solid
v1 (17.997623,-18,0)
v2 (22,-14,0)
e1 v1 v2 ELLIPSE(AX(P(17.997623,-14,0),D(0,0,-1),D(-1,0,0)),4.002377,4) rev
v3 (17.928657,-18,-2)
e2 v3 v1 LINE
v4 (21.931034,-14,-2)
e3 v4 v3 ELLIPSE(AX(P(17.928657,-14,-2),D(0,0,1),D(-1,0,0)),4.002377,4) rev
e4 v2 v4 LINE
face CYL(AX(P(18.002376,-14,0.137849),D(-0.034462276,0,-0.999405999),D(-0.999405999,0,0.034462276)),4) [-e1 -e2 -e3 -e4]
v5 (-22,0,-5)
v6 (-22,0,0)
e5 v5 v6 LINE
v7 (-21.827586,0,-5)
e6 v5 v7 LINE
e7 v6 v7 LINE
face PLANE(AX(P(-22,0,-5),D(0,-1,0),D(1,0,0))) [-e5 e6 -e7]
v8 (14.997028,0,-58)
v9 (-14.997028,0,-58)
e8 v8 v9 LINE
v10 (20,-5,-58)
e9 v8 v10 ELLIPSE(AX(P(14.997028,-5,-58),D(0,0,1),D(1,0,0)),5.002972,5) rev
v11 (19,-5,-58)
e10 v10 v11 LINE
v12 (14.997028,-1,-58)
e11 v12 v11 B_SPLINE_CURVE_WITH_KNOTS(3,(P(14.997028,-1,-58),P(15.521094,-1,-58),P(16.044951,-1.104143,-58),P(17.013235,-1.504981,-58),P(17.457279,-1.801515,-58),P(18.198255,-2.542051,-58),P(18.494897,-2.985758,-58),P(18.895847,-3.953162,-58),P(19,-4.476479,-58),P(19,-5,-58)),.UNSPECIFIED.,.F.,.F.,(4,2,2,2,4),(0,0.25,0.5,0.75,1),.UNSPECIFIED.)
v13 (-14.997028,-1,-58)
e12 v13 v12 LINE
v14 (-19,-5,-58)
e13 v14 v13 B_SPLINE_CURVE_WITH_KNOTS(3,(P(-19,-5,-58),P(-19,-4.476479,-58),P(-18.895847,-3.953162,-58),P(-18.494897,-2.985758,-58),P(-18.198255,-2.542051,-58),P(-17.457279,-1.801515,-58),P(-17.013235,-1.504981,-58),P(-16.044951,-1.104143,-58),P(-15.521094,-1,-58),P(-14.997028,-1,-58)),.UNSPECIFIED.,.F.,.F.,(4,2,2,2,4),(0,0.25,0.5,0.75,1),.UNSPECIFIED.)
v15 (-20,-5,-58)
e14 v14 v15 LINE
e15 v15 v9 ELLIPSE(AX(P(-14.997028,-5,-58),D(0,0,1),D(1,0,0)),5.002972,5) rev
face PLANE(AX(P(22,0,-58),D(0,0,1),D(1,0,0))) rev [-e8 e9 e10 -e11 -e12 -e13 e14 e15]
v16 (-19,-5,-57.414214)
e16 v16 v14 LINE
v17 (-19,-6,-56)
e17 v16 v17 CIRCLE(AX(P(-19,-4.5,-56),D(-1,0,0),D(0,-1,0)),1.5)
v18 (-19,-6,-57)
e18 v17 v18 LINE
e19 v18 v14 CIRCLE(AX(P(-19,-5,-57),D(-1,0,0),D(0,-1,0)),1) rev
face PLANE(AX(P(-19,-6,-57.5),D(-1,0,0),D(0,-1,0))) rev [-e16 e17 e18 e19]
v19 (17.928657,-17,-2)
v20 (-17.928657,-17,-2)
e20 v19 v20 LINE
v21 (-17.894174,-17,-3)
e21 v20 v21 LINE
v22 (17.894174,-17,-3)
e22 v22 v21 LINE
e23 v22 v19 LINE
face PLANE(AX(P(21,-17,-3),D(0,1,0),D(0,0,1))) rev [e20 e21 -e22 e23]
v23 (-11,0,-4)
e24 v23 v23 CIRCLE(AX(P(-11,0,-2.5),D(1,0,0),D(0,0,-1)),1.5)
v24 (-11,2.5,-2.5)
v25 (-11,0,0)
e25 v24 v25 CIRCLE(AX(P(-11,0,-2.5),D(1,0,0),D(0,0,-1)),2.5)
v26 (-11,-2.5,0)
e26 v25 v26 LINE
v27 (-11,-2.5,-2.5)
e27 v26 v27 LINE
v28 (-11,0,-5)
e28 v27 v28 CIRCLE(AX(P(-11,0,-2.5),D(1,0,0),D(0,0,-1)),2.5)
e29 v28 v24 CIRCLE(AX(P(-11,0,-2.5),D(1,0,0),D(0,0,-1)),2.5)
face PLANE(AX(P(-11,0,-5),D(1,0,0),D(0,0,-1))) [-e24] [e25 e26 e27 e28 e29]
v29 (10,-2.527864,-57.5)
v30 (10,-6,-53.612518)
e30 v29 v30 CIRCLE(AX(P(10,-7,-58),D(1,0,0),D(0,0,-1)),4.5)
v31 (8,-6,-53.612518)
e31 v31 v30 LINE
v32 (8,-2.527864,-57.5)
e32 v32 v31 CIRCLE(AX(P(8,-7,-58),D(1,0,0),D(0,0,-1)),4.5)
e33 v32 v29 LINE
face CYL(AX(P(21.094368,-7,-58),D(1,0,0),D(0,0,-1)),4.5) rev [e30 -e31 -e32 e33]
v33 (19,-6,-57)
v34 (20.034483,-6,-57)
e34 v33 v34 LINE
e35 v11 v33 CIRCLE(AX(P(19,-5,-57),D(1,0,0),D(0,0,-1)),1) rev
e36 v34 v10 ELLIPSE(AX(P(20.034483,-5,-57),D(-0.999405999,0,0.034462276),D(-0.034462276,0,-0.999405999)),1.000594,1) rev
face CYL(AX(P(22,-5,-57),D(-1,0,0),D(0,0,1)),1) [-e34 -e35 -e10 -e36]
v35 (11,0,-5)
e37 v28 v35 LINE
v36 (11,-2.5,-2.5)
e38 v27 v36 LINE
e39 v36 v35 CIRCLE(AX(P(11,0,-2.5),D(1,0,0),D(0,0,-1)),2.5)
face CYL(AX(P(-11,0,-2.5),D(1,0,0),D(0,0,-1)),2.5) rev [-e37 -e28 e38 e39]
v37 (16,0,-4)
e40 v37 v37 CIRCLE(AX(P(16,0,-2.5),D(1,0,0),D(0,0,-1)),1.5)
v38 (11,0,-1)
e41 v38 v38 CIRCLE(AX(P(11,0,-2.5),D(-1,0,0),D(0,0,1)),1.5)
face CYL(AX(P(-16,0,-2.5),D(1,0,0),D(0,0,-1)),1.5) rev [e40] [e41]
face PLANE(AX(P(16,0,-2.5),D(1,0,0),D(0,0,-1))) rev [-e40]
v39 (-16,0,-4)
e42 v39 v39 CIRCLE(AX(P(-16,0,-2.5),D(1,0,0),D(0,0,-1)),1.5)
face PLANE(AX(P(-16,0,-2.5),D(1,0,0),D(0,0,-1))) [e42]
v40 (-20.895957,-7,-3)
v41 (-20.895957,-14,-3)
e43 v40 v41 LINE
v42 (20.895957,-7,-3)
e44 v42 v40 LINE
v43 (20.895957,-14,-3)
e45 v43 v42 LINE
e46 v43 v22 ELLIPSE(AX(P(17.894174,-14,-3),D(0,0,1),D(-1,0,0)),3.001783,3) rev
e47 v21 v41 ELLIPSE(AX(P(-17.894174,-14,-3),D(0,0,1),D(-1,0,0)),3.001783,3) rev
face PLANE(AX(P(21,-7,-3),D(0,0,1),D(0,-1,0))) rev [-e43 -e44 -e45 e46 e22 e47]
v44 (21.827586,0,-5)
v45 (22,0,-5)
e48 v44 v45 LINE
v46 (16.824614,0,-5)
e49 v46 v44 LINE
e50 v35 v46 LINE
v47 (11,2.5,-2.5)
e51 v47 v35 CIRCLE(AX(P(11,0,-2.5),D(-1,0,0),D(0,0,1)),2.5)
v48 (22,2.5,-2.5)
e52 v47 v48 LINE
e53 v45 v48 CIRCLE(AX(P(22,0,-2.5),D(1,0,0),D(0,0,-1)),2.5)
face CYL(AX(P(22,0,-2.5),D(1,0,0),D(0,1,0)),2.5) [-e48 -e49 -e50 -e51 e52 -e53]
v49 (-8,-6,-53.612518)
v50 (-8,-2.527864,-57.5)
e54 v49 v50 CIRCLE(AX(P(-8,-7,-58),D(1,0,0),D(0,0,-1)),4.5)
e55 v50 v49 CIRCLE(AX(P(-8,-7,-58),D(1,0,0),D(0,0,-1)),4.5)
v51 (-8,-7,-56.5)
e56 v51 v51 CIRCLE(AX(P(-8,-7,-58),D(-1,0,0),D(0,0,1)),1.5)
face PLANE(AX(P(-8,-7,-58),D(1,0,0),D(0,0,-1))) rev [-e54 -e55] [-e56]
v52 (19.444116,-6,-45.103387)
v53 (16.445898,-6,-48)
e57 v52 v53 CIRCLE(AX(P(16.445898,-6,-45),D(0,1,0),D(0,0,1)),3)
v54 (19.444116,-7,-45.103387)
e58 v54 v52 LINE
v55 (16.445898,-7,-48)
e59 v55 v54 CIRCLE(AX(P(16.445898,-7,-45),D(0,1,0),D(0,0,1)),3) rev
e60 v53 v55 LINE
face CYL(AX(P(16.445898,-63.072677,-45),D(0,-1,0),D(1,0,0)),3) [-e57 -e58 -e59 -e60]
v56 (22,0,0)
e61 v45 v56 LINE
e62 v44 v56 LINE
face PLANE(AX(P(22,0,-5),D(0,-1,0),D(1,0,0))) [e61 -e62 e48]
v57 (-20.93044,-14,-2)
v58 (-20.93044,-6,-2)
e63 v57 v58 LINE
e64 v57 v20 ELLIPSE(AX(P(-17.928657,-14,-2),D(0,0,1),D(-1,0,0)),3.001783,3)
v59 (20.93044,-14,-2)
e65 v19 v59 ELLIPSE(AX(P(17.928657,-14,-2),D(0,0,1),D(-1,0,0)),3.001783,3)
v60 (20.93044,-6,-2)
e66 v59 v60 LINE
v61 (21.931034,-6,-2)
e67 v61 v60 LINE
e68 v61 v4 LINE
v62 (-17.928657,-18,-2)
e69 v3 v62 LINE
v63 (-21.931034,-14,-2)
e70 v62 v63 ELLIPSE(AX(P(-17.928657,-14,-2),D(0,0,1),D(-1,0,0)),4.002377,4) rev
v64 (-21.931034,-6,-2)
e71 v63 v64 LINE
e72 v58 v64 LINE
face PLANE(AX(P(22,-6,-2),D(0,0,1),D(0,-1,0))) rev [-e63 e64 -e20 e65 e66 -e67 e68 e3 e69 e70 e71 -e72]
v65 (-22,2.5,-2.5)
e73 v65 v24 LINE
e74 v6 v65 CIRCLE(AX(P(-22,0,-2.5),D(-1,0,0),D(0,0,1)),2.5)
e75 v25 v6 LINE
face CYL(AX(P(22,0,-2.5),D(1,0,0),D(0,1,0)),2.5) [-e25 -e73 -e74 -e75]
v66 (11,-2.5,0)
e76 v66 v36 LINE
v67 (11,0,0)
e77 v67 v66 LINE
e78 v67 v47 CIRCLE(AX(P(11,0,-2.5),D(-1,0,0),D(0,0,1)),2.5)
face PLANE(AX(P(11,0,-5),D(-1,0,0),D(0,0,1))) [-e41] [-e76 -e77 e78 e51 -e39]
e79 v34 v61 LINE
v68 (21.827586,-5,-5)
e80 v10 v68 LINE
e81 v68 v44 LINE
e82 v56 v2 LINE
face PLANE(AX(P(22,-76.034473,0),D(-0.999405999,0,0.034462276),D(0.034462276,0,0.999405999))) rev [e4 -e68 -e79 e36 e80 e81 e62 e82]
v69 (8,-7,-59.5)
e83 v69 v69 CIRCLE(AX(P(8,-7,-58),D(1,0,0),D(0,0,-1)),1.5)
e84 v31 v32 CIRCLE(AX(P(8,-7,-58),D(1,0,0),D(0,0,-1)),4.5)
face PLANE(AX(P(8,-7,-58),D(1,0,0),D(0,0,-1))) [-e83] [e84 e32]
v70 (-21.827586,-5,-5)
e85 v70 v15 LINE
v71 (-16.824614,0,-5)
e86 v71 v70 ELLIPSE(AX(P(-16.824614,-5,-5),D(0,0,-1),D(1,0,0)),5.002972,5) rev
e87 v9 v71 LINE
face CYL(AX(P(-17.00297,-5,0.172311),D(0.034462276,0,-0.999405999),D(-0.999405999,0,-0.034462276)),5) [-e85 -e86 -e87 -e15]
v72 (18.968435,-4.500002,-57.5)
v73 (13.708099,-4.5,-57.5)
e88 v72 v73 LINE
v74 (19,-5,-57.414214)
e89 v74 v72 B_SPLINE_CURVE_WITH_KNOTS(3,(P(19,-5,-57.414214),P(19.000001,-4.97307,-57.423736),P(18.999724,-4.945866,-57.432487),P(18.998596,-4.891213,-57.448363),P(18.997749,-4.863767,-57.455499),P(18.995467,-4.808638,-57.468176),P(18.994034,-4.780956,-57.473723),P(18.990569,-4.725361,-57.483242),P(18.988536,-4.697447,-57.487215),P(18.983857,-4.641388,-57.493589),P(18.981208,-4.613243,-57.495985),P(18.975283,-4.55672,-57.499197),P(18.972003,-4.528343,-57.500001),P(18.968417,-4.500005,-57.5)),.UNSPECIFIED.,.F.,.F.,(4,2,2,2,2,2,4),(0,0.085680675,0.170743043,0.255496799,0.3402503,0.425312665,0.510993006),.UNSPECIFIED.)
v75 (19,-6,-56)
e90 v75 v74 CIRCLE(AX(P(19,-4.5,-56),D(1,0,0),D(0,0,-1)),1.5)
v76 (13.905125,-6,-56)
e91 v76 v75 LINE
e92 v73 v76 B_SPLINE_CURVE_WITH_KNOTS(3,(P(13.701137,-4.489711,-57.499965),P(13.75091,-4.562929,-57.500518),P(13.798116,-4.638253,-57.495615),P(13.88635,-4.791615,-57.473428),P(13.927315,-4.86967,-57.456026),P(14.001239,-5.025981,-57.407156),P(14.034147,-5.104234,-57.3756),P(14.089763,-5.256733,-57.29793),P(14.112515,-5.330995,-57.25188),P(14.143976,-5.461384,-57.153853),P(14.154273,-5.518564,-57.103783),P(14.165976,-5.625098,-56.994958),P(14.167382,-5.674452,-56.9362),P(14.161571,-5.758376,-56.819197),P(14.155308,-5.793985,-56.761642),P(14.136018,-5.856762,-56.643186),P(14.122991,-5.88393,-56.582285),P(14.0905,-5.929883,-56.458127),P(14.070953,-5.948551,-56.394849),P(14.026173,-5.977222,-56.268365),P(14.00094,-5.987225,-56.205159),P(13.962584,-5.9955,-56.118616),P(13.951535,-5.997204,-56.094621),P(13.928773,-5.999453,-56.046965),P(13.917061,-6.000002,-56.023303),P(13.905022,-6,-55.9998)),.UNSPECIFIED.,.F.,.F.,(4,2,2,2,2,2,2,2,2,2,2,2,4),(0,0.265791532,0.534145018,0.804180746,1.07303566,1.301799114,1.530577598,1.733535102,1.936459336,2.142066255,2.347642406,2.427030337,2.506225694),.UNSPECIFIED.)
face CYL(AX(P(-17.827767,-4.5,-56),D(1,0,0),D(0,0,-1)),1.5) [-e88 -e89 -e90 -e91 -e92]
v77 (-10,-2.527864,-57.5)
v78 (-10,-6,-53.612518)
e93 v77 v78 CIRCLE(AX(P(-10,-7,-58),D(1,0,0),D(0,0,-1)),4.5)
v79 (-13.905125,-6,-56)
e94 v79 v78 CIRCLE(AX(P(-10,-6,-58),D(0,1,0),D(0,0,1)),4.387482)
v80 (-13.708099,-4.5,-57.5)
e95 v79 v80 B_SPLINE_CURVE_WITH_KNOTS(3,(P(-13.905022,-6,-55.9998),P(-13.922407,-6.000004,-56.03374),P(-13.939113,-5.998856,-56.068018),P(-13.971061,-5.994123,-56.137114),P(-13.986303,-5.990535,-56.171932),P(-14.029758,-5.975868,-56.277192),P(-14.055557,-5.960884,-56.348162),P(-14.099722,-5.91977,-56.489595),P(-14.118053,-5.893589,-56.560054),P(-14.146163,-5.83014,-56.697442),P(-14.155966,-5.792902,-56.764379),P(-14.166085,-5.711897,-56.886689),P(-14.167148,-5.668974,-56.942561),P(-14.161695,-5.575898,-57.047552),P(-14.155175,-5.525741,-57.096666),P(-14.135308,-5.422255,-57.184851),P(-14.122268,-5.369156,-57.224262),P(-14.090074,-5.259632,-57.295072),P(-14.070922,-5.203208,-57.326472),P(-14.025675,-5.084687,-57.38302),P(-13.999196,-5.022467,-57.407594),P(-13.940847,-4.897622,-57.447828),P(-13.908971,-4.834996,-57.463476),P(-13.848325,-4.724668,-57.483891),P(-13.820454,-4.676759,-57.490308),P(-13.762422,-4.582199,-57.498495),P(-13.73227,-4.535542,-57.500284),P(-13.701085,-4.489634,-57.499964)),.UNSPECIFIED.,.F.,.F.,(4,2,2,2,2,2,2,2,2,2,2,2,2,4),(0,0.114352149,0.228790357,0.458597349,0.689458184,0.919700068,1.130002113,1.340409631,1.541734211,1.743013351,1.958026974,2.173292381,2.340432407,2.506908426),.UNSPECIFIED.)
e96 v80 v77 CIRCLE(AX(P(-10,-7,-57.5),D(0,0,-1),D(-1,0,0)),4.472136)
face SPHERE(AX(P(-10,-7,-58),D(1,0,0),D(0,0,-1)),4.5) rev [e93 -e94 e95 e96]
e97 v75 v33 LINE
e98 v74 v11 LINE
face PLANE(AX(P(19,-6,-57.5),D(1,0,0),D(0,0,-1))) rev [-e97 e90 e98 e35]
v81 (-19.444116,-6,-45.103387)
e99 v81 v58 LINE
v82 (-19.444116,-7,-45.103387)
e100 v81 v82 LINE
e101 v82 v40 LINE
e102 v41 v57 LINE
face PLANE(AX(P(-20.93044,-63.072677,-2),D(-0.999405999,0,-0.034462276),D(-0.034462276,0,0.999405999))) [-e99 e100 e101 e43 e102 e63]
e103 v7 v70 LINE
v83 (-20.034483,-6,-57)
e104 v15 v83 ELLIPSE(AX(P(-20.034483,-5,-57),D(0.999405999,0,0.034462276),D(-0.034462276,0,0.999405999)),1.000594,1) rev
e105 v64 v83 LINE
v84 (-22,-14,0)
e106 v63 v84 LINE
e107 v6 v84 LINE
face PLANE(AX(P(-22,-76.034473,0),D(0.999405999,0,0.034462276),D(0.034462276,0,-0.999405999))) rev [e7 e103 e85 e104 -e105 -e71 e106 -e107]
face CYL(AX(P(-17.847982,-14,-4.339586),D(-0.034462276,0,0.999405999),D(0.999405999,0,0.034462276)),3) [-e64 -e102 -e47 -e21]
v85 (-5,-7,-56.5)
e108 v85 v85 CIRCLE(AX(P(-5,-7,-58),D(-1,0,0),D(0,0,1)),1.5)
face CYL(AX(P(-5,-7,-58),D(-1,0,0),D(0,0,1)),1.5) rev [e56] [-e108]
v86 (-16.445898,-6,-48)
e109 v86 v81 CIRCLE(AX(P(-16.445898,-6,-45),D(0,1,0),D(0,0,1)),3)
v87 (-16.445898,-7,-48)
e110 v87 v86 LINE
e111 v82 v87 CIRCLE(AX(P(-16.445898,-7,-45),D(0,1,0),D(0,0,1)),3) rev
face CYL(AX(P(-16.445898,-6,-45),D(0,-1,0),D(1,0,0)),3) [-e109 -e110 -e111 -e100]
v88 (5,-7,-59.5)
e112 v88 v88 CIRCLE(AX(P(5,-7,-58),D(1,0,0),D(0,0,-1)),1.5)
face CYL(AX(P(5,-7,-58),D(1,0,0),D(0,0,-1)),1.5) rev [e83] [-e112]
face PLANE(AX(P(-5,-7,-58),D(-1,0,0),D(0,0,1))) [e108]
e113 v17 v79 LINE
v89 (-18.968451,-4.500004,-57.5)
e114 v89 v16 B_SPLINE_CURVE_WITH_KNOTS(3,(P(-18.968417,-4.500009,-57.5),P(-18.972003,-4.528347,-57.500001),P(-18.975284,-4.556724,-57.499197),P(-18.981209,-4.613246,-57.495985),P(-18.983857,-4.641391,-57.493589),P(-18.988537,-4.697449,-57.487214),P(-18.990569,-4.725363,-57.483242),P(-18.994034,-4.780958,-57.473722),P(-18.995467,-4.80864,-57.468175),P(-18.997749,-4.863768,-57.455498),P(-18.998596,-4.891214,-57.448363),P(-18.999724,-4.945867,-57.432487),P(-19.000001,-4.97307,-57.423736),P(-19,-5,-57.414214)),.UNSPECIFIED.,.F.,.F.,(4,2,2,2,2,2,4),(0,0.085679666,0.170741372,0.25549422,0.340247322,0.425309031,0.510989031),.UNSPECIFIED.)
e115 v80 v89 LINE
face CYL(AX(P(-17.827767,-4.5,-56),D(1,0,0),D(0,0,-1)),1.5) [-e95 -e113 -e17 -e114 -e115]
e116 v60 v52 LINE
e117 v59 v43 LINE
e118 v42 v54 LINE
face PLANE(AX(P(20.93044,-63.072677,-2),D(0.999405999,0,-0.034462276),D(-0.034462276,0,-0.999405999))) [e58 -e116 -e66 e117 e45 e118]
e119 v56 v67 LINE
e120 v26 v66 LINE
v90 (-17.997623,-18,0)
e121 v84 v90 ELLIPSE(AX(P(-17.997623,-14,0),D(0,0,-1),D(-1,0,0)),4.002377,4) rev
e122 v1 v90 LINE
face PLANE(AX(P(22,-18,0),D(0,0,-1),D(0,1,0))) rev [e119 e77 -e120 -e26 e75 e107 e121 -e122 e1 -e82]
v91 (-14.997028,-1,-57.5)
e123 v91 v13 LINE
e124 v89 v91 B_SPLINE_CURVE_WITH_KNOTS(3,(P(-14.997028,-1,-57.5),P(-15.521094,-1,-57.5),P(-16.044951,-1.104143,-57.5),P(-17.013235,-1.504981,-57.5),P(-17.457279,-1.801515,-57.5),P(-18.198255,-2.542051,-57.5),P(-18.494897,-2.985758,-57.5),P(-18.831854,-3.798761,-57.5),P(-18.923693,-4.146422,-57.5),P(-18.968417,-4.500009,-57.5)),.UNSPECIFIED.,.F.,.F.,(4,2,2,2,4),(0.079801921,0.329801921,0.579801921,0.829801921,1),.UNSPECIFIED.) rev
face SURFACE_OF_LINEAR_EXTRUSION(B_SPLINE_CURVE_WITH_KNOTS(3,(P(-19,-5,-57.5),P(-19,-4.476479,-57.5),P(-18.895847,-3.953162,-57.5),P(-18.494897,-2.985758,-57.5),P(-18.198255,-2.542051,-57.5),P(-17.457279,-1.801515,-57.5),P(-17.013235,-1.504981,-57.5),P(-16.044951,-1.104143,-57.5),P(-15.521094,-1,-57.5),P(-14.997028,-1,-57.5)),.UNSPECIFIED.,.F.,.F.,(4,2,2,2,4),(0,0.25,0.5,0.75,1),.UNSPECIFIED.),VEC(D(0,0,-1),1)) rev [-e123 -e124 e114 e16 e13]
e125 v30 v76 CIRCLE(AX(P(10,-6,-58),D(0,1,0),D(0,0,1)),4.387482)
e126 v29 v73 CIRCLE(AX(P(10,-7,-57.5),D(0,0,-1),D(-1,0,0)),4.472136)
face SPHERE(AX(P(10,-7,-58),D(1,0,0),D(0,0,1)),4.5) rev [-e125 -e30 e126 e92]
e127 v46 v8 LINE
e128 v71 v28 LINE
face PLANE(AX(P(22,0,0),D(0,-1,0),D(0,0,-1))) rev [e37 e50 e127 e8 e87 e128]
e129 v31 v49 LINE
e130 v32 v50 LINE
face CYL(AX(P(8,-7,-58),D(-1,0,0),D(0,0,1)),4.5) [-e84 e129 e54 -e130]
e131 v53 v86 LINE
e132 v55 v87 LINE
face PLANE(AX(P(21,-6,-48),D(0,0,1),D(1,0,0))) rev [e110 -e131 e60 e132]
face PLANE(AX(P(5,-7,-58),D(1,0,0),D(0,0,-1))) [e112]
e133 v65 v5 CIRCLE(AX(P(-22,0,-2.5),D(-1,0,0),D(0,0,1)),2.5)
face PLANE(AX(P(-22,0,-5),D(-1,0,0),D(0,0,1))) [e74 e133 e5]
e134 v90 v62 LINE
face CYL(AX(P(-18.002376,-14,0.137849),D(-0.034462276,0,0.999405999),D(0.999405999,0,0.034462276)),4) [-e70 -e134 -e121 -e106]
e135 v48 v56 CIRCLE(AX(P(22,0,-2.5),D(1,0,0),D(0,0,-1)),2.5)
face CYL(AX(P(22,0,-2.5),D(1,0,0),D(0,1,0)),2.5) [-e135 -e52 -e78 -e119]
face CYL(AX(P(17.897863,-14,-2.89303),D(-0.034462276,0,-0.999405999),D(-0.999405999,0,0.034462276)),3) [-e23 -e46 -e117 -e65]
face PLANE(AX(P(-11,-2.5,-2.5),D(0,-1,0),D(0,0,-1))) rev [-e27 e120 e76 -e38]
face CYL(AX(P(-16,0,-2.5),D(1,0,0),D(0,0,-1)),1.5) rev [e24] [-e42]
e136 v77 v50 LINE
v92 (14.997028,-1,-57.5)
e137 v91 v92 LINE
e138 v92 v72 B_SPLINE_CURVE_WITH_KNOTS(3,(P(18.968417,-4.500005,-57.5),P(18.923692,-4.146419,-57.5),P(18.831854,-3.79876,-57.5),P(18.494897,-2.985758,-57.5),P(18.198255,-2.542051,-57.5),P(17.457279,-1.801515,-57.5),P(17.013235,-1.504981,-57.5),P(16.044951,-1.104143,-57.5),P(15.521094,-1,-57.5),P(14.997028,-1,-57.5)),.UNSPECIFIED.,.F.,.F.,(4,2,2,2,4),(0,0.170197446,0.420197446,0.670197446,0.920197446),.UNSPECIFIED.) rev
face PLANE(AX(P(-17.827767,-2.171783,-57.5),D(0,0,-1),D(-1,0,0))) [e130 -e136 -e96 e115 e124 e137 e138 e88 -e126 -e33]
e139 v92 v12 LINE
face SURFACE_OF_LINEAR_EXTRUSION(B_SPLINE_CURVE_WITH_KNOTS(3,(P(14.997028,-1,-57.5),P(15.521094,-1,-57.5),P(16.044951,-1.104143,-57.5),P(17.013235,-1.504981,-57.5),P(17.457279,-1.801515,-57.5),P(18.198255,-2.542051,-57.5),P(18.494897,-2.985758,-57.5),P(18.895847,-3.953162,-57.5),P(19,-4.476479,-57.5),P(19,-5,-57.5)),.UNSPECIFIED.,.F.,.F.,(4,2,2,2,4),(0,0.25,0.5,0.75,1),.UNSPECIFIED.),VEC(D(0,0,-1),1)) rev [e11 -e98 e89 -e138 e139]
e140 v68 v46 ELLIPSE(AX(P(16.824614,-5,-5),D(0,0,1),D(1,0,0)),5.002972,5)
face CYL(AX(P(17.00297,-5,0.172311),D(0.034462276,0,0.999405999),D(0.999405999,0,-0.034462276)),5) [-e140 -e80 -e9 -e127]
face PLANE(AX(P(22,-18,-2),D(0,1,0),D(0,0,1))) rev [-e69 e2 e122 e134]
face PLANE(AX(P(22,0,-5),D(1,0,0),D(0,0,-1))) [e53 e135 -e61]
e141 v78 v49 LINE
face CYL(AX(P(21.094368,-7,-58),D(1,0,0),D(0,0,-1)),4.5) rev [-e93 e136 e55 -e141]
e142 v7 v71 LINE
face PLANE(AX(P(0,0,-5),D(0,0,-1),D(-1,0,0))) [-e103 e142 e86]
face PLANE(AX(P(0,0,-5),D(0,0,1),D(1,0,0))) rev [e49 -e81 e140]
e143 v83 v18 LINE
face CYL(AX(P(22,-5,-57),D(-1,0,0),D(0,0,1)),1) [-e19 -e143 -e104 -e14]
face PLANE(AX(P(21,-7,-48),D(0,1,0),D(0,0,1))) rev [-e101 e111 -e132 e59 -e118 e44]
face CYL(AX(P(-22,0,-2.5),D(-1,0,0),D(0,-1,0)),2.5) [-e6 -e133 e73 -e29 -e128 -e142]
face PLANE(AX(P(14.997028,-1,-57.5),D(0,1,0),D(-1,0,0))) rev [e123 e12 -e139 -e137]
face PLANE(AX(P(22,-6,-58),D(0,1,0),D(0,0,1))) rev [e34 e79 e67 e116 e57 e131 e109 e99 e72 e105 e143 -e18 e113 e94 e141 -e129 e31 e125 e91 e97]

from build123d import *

# Parameters (mm, degrees)
EXTRUDE_1_DEPTH     = 22
EXTRUDE_2_DEPTH     = 21
CUT_EXTRUDE_1_REACH = 66.591
CUT_EXTRUDE_2_DEPTH = 11
FILLET_2_R          = 3
FILLET_3_R          = 4
SKETCH_6_W          = 11
SKETCH_6_H          = 2.5
EXTRUDE_6_DEPTH     = 5
FILLET_4_R          = 5
FILLET_5_R          = 2.5
SKETCH_7_R          = 1.5
CUT_EXTRUDE_3_DEPTH = 16
CUT_EXTRUDE_4_DEPTH = 11
CUT_EXTRUDE_5_DEPTH = 0.5
FILLET_7_R          = 1.5
FILLET_8_R          = 1
SKETCH_10_R         = 4.5
EXTRUDE_7_DEPTH     = 8
SKETCH_11_R         = 1.5
CUT_EXTRUDE_6_DEPTH = 3
CUT_EXTRUDE_START   = -3
SKETCH_12_R         = 1.5
CUT_EXTRUDE_7_DEPTH = 3


with BuildPart() as part:
    # Эскиз1 → Бобышка-Вытянуть1 (new, symmetric)
    with BuildSketch(Plane(origin=(0, 0, 0), x_dir=(0, 0, -1), z_dir=(1, 0, 0))):
        Polygon((0, -18), (0, 0), (58, 0), (58, -6), (2, -6), (2, -18), align=None)
    extrude(amount=EXTRUDE_1_DEPTH, both=True)

    # Эскиз2 → Бобышка-Вытянуть2 (add, symmetric)
    with BuildSketch(Plane(origin=(0, 0, 0), x_dir=(0, 0, -1), z_dir=(1, 0, 0))):
        Polygon((2, -6), (48, -6), (48, -7), (3, -7), (3, -17), (2, -17), align=None)
    extrude(amount=EXTRUDE_2_DEPTH, both=True)

    # Вырез-Вытянуть1: up to this face of the body (flat: up to its plane)
    cut_extrude_1_end = Plane(part.part.faces().sort_by_distance((0, -18, -1))[0])
    # Эскиз3 → Вырез-Вытянуть1 (cut, up to the picked face)
    with BuildSketch(Plane(origin=(0, 0, 0), x_dir=(1, 0, 0), z_dir=(0, 1, 0)), mode=Mode.PRIVATE) as cut_extrude_1_sk1:
        Polygon((-20, 58), (-22, 58), (-22, 0), align=None)
    cut_extrude_1_tool1 = split(extrude(cut_extrude_1_sk1.sketch, amount=-CUT_EXTRUDE_1_REACH, mode=Mode.PRIVATE), bisect_by=cut_extrude_1_end, keep=Keep.BOTH, mode=Mode.PRIVATE)
    # Эскиз3 → Вырез-Вытянуть1 (cut, up to the picked face)
    with BuildSketch(Plane(origin=(0, 0, 0), x_dir=(1, 0, 0), z_dir=(0, 1, 0)), mode=Mode.PRIVATE) as cut_extrude_1_sk2:
        Polygon((22, 58), (22, 0), (20, 58), align=None)
    cut_extrude_1_tool2 = split(extrude(cut_extrude_1_sk2.sketch, amount=-CUT_EXTRUDE_1_REACH, mode=Mode.PRIVATE), bisect_by=cut_extrude_1_end, keep=Keep.BOTH, mode=Mode.PRIVATE)
    add(cut_extrude_1_tool1.solids().sort_by(Axis((-21.333333, 0, -38.666667), (0, -1, 0)))[0], mode=Mode.SUBTRACT)
    add(cut_extrude_1_tool2.solids().sort_by(Axis((21.333333, 0, -38.666667), (0, -1, 0)))[0], mode=Mode.SUBTRACT)

    # Эскиз4 → Вырез-Вытянуть2 (cut)
    with BuildSketch(Plane.XZ.offset(6)):
        Polygon((-20.930440129, -2), (-19.344233233, -48), (-20.344827586, -48), (-21.931034483, -2), align=None)
        Polygon((19.344233233, -48), (20.344827586, -48), (21.931034483, -2), (20.930440129, -2), align=None)
    extrude(amount=CUT_EXTRUDE_2_DEPTH, mode=Mode.SUBTRACT)

    # Скругление2
    fillet_2_edges = [part.edges().sort_by_distance(p)[0] for p in [
        (19.344233233, -6.5, -48),
        (-19.344233233, -6.5, -48),
        (-20.91319875, -17, -2.5),
        (20.91319875, -17, -2.5),
    ]]
    fillet(fillet_2_edges, radius=FILLET_2_R)

    # Скругление3
    fillet_3_edges = [part.edges().sort_by_distance(p)[0] for p in [
        (-21.965517241, -18, -1),
        (21.965517241, -18, -1),
    ]]
    fillet(fillet_3_edges, radius=FILLET_3_R)

    # Эскиз6 → Бобышка-Вытянуть6 (add)
    with BuildSketch(Plane.XY):
        with Locations((-16.5, 1.25)):
            Rectangle(SKETCH_6_W, SKETCH_6_H)
        with Locations((16.5, 1.25)):
            Rectangle(SKETCH_6_W, SKETCH_6_H)
    extrude(amount=-EXTRUDE_6_DEPTH)

    # Скругление4
    fillet_4_edges = [part.edges().sort_by_distance(p)[0] for p in [
        (-20.913793103, 0, -31.5),
        (20.913793103, 0, -31.5),
    ]]
    fillet(fillet_4_edges, radius=FILLET_4_R)

    # Скругление5
    fillet_5_edges = [part.edges().sort_by_distance(p)[0] for p in [
        (-16.5, 2.5, -5),
        (-16.5, 2.5, 0),
        (16.5, 2.5, -5),
        (16.5, 2.5, 0),
    ]]
    fillet(fillet_5_edges, radius=FILLET_5_R - 0.0001)  # a hair under: the kernel refuses the full size

    # Эскиз7 → Вырез-Вытянуть3 (cut, symmetric)
    with BuildSketch(Plane(origin=(0, 0, 0), x_dir=(0, 0, -1), z_dir=(1, 0, 0))):
        with Locations((2.5, 0)):
            Circle(SKETCH_7_R)
    extrude(amount=CUT_EXTRUDE_3_DEPTH, both=True, mode=Mode.SUBTRACT)

    # Эскиз8 → Вырез-Вытянуть4 (cut, symmetric)
    with BuildSketch(Plane(origin=(0, 0, 0), x_dir=(0, 0, -1), z_dir=(1, 0, 0))):
        with BuildLine():
            Line((2.5, -2.5), (0, -2.5))
            Line((0, -2.5), (0, 0))
            ThreePointArc((0, 0), (4.267766953, 1.767766953), (2.5, -2.5))
        make_face()
    extrude(amount=CUT_EXTRUDE_4_DEPTH, both=True, mode=Mode.SUBTRACT)

    # Эскиз9 → Вырез-Вытянуть5 (cut)
    with BuildSketch(Plane(origin=(0, 0, -58), x_dir=(-1, 0, 0), z_dir=(0, 0, -1))):
        with BuildLine():
            Line((-14.997028232, -1), (14.997028232, -1))
            add(Edge.make_bspline(
                [(14.997028232, -1), (15.521093765, -1), (16.044951376, -1.104143211), (17.013235139, -1.504981238), (17.457278985, -1.801515154), (18.198254652, -2.542050681), (18.494897371, -2.985758471), (18.895847322, -3.953162299), (19, -4.476479025), (19, -5)],
                knots=[0, 0, 0, 0, 0.25, 0.25, 0.5, 0.5, 0.75, 0.75, 1, 1, 1, 1], degree=3))
            Line((19, -5), (19, -6))
            Line((19, -6), (-19, -6))
            Line((-19, -6), (-19, -5))
            add(Edge.make_bspline(
                [(-14.997028232, -1), (-15.521093765, -1), (-16.044951376, -1.104143211), (-17.013235139, -1.504981238), (-17.457278985, -1.801515154), (-18.198254652, -2.542050681), (-18.494897371, -2.985758471), (-18.895847322, -3.953162299), (-19, -4.476479025), (-19, -5)],
                knots=[0, 0, 0, 0, 0.25, 0.25, 0.5, 0.5, 0.75, 0.75, 1, 1, 1, 1], degree=3))
        make_face()
    extrude(amount=-CUT_EXTRUDE_5_DEPTH, mode=Mode.SUBTRACT)

    # Скругление7
    fillet_7_edges = [part.edges().sort_by_distance(p)[0] for p in [
        (0, -6, -57.5),
    ]]
    fillet(fillet_7_edges, radius=FILLET_7_R)

    # Скругление8
    fillet_8_edges = [part.edges().sort_by_distance(p)[0] for p in [
        (-19.5, -6, -58),
        (19.5, -6, -58),
    ]]
    fillet(fillet_8_edges, radius=FILLET_8_R)

    # Эскиз10 → Бобышка-Вытянуть7 (add, symmetric)
    with BuildSketch(Plane(origin=(0, 0, 0), x_dir=(0, 0, -1), z_dir=(1, 0, 0))):
        with Locations((58, -7)):
            Circle(SKETCH_10_R)
    extrude(amount=EXTRUDE_7_DEPTH, both=True)

    # Эскиз11 → Вырез-Вытянуть6 (cut)
    with BuildSketch(Plane(origin=(8, 0, 0), x_dir=(0, 0, -1), z_dir=(1, 0, 0))):
        with Locations((58, -7)):
            Circle(SKETCH_11_R)
    extrude(amount=-CUT_EXTRUDE_6_DEPTH, mode=Mode.SUBTRACT)

    # Эскиз12 → Вырез-Вытянуть7 (cut)
    with BuildSketch(Plane.ZY.offset(8).offset(CUT_EXTRUDE_START)):
        with Locations(Location((-58, -7, 0), (0, 0, 180))):
            Circle(SKETCH_12_R)
    extrude(amount=CUT_EXTRUDE_7_DEPTH, mode=Mode.SUBTRACT)

    # Эскиз13 → Вырез-Повернуть1 (revolve, cut)
    with BuildSketch(Plane(origin=(0, -7, 0), x_dir=(-1, 0, 0), z_dir=(0, 1, 0)), mode=Mode.PRIVATE) as cut_revolve_1_sk:
        with BuildLine():
            Line((-14.5, -58), (-8, -58))
            Line((-8, -58), (-8, -62.5))
            Line((-8, -62.5), (-10, -62.5))
            ThreePointArc((-10, -62.5), (-13.181980515, -61.181980515), (-14.5, -58))
        make_face()
        with BuildLine():
            Line((8, -58), (8, -62.5))
            Line((8, -62.5), (10, -62.5))
            ThreePointArc((10, -62.5), (13.181980515, -61.181980515), (14.5, -58))
            Line((14.5, -58), (8, -58))
        make_face()
    revolve(cut_revolve_1_sk.sketch.rotate(Axis((21.094367923, -7, -58), (-1, 0, 0)), 180), axis=Axis((21.094367923, -7, -58), (-1, 0, 0)), mode=Mode.SUBTRACT)


solid = part.part
